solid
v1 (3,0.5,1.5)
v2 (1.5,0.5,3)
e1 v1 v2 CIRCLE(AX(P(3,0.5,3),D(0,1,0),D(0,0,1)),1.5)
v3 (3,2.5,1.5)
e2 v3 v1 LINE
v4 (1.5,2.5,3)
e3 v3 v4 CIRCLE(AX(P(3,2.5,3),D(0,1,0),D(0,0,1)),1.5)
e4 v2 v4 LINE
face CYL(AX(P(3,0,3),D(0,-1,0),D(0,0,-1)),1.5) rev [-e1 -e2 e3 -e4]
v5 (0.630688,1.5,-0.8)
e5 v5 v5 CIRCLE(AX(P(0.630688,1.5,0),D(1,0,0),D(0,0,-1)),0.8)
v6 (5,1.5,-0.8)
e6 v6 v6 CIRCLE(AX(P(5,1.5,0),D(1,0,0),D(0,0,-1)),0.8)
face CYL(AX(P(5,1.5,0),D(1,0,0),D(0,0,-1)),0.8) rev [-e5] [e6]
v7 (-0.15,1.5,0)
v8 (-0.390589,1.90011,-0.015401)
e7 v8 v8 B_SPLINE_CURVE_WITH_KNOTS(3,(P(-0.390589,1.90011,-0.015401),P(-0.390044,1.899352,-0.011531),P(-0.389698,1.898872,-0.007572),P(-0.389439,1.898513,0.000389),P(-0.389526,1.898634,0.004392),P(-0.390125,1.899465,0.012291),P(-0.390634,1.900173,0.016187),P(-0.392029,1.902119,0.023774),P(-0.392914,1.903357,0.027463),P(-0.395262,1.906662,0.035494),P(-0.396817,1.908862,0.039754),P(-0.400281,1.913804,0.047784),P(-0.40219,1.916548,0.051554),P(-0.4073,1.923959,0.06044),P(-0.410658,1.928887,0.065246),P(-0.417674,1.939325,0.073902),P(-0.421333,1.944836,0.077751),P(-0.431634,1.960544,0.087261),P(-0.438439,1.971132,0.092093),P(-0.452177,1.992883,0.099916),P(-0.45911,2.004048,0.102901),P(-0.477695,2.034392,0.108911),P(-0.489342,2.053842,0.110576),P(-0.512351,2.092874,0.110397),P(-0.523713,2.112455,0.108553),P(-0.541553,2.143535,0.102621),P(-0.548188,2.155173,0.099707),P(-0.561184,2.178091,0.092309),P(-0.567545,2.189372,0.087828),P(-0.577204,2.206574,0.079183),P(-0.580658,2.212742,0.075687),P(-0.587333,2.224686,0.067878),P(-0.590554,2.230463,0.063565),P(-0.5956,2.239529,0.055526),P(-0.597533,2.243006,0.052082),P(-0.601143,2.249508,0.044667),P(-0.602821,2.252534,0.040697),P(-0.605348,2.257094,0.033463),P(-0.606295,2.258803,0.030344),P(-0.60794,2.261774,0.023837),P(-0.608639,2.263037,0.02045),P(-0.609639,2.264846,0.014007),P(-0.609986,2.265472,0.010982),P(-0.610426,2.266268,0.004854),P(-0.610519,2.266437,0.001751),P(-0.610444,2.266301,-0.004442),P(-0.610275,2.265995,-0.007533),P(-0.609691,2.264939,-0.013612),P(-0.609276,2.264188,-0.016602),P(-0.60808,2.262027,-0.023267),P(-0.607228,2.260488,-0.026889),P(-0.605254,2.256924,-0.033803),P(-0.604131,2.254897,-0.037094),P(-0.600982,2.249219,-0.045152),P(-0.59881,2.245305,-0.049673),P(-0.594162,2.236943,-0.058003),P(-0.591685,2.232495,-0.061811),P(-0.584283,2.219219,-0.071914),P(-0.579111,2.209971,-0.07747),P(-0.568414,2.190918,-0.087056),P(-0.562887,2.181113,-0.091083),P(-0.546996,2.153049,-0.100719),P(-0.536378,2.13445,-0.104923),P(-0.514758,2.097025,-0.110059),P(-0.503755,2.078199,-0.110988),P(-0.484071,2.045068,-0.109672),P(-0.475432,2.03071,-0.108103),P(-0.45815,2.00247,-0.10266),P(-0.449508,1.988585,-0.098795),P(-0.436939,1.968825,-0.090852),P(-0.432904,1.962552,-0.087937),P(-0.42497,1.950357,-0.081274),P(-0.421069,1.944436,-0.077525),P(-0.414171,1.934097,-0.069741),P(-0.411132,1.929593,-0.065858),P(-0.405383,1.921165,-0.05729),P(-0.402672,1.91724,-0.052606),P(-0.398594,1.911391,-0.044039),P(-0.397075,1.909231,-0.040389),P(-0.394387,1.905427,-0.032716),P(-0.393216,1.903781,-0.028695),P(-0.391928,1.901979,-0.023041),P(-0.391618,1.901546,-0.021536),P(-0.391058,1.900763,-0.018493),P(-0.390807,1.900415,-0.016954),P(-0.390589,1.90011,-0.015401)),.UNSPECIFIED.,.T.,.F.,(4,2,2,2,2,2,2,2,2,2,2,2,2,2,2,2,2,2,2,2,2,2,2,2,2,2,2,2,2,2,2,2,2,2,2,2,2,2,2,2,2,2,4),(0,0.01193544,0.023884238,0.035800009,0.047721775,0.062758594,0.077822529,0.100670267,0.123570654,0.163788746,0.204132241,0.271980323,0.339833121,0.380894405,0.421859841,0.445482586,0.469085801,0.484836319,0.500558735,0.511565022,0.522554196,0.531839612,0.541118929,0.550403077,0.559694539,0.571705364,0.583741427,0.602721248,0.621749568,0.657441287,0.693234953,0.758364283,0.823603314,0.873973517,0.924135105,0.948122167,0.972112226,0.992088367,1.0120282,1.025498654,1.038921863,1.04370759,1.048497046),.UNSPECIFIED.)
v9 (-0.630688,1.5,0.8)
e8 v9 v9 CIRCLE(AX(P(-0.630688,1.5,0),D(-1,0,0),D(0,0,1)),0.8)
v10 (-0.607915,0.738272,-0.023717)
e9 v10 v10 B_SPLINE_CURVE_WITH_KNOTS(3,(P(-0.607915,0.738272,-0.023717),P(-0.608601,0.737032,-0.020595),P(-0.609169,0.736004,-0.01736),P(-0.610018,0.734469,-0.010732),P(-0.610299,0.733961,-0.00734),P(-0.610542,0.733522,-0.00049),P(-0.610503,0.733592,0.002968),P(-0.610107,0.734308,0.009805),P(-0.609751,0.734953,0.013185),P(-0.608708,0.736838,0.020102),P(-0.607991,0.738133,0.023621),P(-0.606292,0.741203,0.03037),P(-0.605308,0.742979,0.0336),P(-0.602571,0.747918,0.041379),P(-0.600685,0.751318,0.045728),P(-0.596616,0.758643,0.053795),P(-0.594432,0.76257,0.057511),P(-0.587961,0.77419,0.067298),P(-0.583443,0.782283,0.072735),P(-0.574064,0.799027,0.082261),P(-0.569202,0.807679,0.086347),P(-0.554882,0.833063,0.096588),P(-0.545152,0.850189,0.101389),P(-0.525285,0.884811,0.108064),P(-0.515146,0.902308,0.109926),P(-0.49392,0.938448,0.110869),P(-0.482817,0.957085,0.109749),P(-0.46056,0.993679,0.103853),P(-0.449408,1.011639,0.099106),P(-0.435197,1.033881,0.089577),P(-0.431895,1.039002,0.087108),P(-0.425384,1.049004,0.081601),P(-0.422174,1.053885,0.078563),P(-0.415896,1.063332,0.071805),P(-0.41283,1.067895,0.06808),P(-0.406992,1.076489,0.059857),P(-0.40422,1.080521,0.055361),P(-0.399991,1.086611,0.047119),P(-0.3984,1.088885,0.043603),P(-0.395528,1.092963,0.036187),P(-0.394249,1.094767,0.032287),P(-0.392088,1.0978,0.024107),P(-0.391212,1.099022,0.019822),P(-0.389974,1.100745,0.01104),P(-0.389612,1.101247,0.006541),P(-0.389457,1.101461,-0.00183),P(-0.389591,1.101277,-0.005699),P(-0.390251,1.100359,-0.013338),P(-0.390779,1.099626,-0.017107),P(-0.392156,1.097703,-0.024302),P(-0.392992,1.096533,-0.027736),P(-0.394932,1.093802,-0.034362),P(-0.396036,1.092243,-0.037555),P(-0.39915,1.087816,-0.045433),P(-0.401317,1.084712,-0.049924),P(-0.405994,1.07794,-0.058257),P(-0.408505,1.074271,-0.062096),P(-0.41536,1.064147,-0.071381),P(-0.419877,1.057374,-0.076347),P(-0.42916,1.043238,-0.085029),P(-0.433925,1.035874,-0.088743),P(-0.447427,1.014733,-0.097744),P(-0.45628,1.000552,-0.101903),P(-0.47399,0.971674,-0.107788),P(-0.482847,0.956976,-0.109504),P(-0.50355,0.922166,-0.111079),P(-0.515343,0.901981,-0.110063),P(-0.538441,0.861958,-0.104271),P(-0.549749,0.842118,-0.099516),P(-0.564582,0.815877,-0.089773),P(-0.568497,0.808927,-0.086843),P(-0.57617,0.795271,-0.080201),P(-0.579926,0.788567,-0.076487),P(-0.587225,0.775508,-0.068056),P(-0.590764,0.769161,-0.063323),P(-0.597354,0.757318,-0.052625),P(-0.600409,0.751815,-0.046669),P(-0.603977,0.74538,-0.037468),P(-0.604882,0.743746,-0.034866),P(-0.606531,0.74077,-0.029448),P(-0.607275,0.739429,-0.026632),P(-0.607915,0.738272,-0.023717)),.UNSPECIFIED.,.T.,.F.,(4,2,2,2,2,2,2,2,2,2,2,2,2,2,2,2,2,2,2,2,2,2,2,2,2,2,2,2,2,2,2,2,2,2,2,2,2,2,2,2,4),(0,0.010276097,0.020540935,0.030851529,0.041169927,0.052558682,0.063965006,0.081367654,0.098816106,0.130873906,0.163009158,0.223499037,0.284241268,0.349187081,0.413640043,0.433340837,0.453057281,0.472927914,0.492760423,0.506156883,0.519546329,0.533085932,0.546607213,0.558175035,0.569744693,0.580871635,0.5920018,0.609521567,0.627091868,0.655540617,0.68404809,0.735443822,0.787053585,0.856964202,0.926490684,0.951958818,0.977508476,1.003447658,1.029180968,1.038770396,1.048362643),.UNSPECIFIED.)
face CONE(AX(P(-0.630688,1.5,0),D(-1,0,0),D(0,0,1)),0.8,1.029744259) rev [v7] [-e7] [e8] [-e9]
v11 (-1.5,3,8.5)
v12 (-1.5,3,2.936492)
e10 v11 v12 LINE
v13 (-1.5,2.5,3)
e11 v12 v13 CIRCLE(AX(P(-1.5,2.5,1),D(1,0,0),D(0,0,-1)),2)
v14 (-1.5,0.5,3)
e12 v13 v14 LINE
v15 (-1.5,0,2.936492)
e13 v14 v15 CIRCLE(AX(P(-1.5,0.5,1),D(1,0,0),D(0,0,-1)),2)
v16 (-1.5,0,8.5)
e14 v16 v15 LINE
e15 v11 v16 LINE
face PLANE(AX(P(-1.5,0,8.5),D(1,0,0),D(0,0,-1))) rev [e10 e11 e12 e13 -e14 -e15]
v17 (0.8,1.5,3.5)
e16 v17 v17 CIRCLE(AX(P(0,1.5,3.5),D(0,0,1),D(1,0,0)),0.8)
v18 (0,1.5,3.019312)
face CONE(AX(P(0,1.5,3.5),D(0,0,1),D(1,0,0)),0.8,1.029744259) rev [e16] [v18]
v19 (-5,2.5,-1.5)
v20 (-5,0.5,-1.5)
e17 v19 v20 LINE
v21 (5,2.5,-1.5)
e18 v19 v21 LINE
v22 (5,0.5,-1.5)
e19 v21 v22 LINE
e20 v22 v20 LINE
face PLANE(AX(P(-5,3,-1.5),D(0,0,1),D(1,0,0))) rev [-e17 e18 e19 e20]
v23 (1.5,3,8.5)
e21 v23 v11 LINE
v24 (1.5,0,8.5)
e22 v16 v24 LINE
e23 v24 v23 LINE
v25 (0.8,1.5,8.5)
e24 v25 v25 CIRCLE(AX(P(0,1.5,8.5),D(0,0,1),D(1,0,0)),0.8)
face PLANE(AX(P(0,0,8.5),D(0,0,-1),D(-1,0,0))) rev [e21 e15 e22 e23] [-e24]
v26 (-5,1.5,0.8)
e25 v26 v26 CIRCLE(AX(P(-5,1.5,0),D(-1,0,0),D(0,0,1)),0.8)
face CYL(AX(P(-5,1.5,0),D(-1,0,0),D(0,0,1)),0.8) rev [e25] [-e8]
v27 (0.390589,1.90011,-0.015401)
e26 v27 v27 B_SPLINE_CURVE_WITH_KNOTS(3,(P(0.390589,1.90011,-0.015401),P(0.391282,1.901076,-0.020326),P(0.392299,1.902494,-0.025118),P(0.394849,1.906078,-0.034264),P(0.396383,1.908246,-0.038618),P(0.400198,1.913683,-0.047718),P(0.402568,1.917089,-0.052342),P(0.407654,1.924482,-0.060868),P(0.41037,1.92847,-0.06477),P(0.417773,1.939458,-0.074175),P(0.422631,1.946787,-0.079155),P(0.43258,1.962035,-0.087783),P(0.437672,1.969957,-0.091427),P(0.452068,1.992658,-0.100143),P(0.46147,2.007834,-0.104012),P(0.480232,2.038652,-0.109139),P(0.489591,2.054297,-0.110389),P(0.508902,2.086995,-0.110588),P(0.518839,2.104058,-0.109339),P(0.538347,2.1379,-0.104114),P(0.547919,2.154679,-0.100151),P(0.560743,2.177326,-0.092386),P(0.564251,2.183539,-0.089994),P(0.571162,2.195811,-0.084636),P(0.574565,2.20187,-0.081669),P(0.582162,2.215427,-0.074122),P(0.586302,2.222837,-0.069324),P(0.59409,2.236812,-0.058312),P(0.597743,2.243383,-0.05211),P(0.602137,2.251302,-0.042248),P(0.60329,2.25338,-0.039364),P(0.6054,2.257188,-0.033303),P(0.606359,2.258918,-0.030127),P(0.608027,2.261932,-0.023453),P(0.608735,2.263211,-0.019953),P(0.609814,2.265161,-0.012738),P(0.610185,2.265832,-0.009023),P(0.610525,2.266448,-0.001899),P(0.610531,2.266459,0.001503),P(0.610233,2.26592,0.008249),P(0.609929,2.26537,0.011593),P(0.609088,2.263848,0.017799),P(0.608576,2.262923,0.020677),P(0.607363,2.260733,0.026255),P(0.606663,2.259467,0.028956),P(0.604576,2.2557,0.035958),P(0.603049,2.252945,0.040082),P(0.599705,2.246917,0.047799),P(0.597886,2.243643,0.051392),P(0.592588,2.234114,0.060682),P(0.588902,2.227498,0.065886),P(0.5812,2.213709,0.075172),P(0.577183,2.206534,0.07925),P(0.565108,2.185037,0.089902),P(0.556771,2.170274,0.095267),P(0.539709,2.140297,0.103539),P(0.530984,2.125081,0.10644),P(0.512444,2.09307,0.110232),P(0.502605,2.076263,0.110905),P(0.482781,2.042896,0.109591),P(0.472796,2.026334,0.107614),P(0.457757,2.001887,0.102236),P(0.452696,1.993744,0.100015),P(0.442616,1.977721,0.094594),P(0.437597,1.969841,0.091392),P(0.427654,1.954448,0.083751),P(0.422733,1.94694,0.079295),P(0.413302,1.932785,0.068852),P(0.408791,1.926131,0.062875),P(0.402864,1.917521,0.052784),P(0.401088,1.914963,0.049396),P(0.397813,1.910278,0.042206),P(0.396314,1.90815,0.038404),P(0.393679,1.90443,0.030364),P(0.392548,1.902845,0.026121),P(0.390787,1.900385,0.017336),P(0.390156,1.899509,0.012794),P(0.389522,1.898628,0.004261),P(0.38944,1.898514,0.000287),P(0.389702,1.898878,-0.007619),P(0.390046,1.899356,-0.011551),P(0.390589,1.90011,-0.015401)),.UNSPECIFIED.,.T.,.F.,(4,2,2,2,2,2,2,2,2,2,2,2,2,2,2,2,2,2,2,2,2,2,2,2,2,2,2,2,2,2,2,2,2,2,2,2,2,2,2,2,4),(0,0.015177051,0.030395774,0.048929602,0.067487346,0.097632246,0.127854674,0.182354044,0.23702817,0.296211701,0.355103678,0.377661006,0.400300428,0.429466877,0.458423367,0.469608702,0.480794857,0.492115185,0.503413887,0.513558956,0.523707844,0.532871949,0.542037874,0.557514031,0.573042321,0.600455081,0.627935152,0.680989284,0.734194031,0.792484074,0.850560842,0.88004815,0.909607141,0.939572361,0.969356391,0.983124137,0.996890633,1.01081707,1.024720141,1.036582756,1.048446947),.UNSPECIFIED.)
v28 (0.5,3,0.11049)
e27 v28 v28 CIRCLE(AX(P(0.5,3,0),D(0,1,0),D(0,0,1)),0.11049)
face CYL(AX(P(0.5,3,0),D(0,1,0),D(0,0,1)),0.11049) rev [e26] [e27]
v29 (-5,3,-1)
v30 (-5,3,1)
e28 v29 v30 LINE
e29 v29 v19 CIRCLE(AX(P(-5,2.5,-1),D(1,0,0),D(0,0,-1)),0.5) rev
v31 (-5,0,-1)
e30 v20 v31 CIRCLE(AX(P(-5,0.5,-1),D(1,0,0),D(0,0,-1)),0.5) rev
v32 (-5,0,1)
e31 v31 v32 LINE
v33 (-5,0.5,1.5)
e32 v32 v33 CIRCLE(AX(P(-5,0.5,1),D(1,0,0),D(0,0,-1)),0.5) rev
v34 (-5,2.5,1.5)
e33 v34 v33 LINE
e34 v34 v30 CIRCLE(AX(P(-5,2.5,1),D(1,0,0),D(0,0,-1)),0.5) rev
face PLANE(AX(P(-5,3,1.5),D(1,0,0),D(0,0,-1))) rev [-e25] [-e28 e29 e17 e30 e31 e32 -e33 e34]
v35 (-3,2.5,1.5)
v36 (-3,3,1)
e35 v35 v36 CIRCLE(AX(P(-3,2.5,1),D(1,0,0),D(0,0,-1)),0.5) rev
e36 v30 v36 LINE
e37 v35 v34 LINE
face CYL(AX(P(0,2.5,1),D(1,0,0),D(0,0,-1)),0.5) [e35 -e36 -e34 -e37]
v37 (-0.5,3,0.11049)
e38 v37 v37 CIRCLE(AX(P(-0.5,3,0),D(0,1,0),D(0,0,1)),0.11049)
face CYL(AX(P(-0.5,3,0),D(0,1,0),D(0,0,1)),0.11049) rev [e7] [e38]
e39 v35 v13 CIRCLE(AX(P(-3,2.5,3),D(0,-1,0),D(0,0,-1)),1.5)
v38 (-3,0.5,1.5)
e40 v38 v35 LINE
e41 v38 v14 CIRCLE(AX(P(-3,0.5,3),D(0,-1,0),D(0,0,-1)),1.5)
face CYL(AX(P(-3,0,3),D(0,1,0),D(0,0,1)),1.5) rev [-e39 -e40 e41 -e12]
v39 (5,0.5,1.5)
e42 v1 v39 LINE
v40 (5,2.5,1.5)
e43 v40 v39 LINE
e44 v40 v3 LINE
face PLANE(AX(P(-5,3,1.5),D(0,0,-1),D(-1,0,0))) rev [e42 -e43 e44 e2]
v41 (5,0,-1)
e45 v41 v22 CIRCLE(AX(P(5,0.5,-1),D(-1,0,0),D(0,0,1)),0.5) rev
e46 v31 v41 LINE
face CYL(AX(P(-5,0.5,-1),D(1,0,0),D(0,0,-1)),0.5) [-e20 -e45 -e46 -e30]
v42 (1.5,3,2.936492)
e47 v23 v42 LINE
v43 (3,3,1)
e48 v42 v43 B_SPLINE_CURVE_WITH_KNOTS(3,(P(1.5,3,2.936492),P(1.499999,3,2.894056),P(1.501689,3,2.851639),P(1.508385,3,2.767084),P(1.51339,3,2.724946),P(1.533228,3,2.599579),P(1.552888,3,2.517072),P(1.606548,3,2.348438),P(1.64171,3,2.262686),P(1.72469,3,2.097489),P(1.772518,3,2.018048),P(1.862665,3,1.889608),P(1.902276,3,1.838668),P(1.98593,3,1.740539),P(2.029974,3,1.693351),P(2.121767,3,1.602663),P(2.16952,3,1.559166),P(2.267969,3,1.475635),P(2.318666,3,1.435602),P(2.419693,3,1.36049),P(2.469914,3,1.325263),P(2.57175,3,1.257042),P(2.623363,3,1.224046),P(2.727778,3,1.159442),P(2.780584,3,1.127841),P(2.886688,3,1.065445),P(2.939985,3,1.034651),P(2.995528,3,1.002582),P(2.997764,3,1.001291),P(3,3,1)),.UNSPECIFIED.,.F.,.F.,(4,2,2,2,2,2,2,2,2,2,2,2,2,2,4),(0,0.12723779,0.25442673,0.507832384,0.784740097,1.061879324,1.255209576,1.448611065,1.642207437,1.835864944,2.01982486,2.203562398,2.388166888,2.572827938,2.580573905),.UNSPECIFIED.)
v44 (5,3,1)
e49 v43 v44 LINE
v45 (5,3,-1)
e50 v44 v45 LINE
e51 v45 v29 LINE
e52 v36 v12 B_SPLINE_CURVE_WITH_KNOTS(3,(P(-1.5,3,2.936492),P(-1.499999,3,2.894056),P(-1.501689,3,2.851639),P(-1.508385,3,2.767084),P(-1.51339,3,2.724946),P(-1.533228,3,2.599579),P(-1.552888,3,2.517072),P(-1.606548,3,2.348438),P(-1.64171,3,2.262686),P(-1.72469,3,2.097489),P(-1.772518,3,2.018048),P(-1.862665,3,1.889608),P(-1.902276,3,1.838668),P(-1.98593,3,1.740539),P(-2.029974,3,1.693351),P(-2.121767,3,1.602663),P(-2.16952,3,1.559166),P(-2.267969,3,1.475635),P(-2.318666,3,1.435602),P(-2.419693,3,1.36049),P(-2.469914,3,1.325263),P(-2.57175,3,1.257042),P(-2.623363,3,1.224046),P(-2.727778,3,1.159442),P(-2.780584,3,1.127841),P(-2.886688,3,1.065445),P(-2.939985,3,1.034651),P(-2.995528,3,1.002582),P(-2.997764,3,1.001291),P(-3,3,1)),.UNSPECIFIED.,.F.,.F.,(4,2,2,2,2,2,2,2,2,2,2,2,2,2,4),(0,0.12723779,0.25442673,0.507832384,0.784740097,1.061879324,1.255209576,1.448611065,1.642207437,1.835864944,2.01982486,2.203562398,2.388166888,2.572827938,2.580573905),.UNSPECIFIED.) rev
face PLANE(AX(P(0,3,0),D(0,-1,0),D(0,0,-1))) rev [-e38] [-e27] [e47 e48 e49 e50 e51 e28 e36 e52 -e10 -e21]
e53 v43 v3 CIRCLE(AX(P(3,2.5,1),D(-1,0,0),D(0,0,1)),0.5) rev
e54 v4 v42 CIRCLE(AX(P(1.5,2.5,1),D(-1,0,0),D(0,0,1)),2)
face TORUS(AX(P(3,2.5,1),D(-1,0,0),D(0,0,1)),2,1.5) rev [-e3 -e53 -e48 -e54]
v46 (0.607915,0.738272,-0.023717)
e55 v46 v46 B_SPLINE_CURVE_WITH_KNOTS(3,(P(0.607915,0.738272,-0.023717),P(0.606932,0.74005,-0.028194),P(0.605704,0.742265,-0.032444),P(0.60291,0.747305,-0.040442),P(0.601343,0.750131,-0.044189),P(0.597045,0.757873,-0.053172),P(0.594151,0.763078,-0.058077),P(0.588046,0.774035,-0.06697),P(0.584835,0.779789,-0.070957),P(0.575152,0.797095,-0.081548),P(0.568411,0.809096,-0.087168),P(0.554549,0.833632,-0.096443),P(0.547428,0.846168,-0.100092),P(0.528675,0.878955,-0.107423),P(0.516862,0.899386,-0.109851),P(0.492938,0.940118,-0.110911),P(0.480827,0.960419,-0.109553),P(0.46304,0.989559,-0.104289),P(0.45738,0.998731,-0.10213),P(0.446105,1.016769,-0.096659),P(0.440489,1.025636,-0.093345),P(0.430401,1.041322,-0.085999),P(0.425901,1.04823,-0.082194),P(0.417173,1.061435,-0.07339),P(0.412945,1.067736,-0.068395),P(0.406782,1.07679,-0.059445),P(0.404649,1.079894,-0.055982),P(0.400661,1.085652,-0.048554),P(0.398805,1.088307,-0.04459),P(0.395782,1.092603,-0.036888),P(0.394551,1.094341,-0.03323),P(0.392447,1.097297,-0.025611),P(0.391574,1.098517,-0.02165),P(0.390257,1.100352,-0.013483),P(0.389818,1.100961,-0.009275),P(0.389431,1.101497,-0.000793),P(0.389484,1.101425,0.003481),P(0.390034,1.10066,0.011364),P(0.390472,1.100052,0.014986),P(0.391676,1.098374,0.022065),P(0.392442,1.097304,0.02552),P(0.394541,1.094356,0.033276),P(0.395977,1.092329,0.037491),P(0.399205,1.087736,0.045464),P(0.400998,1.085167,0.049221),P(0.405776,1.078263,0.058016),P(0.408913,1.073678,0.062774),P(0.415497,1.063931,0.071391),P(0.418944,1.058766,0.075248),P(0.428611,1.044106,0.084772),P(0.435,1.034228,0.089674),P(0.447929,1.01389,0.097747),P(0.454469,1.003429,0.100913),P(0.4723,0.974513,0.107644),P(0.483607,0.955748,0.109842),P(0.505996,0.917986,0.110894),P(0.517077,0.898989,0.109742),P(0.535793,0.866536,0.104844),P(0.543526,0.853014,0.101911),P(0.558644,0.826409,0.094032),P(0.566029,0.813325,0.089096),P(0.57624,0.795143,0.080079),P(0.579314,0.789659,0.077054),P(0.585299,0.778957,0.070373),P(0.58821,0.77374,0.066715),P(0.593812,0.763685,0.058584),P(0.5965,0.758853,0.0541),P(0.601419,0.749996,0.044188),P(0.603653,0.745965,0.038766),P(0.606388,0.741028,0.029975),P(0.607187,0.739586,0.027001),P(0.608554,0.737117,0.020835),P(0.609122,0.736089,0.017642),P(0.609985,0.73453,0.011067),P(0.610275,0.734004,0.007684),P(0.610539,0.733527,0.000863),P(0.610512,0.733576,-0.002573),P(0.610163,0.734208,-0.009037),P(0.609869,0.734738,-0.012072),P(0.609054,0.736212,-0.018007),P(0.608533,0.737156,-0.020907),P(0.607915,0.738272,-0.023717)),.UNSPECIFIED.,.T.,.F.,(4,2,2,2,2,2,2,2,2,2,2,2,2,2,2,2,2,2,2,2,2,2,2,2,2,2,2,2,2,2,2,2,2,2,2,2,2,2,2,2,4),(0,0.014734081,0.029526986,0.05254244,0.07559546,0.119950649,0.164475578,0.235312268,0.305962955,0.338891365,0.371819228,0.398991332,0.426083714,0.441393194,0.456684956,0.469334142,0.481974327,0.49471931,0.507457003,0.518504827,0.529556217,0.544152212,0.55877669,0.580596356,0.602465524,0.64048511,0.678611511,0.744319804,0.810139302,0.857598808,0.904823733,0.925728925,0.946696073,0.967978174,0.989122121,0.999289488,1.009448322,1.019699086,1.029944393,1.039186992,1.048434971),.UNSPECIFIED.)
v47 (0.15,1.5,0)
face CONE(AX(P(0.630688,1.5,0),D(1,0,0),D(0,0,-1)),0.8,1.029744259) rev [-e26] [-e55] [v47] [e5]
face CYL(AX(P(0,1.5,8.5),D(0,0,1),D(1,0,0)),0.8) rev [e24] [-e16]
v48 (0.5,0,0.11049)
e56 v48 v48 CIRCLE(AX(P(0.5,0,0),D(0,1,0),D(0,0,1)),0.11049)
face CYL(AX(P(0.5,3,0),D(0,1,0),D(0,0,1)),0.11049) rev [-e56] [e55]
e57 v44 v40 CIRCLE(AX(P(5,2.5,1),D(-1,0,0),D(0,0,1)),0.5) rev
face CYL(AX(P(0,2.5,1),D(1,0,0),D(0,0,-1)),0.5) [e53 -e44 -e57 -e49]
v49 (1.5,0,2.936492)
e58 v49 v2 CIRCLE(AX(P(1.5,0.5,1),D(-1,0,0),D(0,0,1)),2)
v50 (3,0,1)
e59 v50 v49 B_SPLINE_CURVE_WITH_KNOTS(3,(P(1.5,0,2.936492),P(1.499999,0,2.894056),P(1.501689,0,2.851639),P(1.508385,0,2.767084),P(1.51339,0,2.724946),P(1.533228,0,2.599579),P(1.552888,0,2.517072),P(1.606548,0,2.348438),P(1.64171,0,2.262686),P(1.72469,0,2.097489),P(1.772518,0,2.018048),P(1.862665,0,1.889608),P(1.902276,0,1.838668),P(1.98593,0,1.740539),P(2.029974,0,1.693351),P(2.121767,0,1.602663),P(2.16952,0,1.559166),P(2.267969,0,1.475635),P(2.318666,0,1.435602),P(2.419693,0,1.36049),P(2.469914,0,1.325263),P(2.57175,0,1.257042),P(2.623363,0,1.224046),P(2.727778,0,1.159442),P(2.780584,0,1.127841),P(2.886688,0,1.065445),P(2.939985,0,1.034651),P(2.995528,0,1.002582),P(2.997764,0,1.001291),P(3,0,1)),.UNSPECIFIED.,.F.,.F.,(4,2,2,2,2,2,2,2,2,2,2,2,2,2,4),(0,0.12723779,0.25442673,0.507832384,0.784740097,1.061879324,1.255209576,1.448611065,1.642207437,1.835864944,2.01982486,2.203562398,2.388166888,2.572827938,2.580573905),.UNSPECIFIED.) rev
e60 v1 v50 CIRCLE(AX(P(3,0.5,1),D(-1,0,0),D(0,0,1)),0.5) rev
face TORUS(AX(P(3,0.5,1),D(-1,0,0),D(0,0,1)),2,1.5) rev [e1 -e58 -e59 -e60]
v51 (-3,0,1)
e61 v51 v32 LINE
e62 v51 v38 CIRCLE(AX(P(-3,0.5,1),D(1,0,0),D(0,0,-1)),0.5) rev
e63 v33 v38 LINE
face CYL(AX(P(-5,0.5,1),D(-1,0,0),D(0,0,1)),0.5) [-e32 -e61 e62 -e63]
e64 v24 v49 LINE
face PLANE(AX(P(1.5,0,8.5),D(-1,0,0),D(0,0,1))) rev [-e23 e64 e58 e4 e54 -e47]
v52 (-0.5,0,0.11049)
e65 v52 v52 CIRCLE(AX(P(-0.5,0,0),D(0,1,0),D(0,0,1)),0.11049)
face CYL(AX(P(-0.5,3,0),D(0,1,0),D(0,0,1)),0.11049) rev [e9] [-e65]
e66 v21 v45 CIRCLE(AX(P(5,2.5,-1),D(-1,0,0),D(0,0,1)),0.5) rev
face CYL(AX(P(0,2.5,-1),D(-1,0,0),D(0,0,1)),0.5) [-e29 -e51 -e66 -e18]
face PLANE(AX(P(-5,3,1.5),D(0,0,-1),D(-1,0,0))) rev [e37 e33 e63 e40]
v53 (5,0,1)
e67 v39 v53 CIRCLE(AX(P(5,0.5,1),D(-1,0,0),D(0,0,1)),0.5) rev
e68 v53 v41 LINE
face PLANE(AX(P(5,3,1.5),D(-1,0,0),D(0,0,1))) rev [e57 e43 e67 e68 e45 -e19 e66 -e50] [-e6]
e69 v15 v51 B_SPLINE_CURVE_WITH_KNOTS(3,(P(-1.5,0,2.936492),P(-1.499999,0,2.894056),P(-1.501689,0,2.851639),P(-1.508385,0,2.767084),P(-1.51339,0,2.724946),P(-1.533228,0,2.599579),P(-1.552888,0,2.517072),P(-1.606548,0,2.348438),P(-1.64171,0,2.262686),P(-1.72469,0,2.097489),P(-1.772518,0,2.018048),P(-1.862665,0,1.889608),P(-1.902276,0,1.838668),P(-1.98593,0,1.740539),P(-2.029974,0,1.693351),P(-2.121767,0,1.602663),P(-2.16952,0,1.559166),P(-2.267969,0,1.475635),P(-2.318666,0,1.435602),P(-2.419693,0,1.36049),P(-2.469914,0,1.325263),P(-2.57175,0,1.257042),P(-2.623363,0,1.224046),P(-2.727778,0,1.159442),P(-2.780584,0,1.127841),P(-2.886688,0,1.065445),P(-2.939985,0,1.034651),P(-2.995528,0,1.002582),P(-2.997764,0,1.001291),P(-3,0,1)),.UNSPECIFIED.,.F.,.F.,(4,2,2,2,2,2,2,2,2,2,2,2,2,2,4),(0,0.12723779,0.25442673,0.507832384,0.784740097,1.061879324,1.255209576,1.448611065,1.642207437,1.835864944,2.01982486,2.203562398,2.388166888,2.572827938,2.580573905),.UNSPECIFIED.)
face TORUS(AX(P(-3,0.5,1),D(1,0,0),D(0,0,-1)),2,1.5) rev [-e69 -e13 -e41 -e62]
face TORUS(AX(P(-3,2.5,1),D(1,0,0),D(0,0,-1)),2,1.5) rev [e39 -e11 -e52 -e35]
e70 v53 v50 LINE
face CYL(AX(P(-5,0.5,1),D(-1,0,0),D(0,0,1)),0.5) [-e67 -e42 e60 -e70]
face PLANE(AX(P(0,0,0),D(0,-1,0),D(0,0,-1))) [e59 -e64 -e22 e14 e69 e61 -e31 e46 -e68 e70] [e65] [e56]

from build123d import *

# Parameters (mm, degrees)
SKETCH1_W                    = 10
SKETCH1_H                    = 3
BOSS_EXTRUDE1_DEPTH          = 3
F_90_0_0087_DIAMETER_HOLE1_D = 0.22098
SKETCH15_W                   = 3
SKETCH15_H                   = 3
BOSS_EXTRUDE2_DEPTH          = 7
M2X0_4_TAPPED_HOLE1_D        = 1.6
M2X0_4_TAPPED_HOLE1_DEPTH    = 5
M2X0_4_TAPPED_HOLE1_TIP      = 0.480688495
FILLET4_R                    = 0.5
FILLET3_R                    = 1.5


with BuildPart() as part:
    # Sketch1 → Boss-Extrude1 (new body)
    with BuildSketch(Plane(origin=(0, 0, 0), x_dir=(1, 0, 0), z_dir=(0, 1, 0))):
        Rectangle(SKETCH1_W, SKETCH1_H)
    extrude(amount=BOSS_EXTRUDE1_DEPTH)

    # #90 (0.0087) Diameter Hole1 (through all)
    with Locations(Plane(origin=(0, 3, 0), x_dir=(1, 0, 0), z_dir=(0, 1, 0))):
        with Locations((0.5, 0), (-0.5, 0)):
            Hole(F_90_0_0087_DIAMETER_HOLE1_D / 2)

    # Sketch8 → Tap Drill for M2x0.4 Tap1 (revolve, cut)
    with BuildSketch(Plane(origin=(-5, 1.5, 0), x_dir=(0, 0, 1), z_dir=(0, 1, 0))):
        Polygon((0, 0), (0, 4.85), (0.8, 4.369311505), (0.8, 0), align=None)
    tap_drill_for_m2x0_4_tap1 = revolve(axis=Axis((-11.35, 1.5, 0), (1, 0, 0)), mode=Mode.SUBTRACT)

    # Mirror1: Tap Drill for M2x0.4 Tap1 across plane
    add(tap_drill_for_m2x0_4_tap1.mirror(Plane(origin=(0, 0, 0), x_dir=(0, 0, 1), z_dir=(1, 0, 0))), mode=Mode.SUBTRACT)

    # Sketch15 → Boss-Extrude2 (add)
    with BuildSketch(Plane.XY.offset(1.5)):
        with Locations((0, 1.5)):
            Rectangle(SKETCH15_W, SKETCH15_H)
    extrude(amount=BOSS_EXTRUDE2_DEPTH)

    # M2x0.4 Tapped Hole1
    with Locations(Plane.XY.offset(8.5)):
        with Locations((0, 1.5)):
            Hole(M2X0_4_TAPPED_HOLE1_D / 2, depth=M2X0_4_TAPPED_HOLE1_DEPTH)
            with Locations((0, 0, -(M2X0_4_TAPPED_HOLE1_DEPTH + M2X0_4_TAPPED_HOLE1_TIP / 2))):  # 118° drill point
                Cone(0, M2X0_4_TAPPED_HOLE1_D / 2, M2X0_4_TAPPED_HOLE1_TIP, mode=Mode.SUBTRACT)

    # Fillet4
    fillet4_edges = [part.edges().sort_by_distance(p)[0] for p in [
        (3.25, 3, 1.5),
        (3.25, 0, 1.5),
        (-3.25, 0, 1.5),
        (0, 0, -1.5),
        (0, 3, -1.5),
        (-3.25, 3, 1.5),
    ]]
    fillet(fillet4_edges, radius=FILLET4_R)

    # Fillet3
    fillet3_edges = [part.edges().sort_by_distance(p)[0] for p in [
        (-1.5, 1.5, 1.5),
        (-1.5, 0.146446609, 1.353553391),
        (-1.5, 2.853553391, 1.353553391),
    ]]
    fillet(fillet3_edges, radius=FILLET3_R)
    fillet3_2_edges = [part.edges().sort_by_distance(p)[0] for p in [
        (1.5, 2.853553391, 1.353553391),
        (1.5, 1.5, 1.5),
        (1.5, 0.146446609, 1.353553391),
    ]]
    fillet(fillet3_2_edges, radius=FILLET3_R)


solid = part.part
